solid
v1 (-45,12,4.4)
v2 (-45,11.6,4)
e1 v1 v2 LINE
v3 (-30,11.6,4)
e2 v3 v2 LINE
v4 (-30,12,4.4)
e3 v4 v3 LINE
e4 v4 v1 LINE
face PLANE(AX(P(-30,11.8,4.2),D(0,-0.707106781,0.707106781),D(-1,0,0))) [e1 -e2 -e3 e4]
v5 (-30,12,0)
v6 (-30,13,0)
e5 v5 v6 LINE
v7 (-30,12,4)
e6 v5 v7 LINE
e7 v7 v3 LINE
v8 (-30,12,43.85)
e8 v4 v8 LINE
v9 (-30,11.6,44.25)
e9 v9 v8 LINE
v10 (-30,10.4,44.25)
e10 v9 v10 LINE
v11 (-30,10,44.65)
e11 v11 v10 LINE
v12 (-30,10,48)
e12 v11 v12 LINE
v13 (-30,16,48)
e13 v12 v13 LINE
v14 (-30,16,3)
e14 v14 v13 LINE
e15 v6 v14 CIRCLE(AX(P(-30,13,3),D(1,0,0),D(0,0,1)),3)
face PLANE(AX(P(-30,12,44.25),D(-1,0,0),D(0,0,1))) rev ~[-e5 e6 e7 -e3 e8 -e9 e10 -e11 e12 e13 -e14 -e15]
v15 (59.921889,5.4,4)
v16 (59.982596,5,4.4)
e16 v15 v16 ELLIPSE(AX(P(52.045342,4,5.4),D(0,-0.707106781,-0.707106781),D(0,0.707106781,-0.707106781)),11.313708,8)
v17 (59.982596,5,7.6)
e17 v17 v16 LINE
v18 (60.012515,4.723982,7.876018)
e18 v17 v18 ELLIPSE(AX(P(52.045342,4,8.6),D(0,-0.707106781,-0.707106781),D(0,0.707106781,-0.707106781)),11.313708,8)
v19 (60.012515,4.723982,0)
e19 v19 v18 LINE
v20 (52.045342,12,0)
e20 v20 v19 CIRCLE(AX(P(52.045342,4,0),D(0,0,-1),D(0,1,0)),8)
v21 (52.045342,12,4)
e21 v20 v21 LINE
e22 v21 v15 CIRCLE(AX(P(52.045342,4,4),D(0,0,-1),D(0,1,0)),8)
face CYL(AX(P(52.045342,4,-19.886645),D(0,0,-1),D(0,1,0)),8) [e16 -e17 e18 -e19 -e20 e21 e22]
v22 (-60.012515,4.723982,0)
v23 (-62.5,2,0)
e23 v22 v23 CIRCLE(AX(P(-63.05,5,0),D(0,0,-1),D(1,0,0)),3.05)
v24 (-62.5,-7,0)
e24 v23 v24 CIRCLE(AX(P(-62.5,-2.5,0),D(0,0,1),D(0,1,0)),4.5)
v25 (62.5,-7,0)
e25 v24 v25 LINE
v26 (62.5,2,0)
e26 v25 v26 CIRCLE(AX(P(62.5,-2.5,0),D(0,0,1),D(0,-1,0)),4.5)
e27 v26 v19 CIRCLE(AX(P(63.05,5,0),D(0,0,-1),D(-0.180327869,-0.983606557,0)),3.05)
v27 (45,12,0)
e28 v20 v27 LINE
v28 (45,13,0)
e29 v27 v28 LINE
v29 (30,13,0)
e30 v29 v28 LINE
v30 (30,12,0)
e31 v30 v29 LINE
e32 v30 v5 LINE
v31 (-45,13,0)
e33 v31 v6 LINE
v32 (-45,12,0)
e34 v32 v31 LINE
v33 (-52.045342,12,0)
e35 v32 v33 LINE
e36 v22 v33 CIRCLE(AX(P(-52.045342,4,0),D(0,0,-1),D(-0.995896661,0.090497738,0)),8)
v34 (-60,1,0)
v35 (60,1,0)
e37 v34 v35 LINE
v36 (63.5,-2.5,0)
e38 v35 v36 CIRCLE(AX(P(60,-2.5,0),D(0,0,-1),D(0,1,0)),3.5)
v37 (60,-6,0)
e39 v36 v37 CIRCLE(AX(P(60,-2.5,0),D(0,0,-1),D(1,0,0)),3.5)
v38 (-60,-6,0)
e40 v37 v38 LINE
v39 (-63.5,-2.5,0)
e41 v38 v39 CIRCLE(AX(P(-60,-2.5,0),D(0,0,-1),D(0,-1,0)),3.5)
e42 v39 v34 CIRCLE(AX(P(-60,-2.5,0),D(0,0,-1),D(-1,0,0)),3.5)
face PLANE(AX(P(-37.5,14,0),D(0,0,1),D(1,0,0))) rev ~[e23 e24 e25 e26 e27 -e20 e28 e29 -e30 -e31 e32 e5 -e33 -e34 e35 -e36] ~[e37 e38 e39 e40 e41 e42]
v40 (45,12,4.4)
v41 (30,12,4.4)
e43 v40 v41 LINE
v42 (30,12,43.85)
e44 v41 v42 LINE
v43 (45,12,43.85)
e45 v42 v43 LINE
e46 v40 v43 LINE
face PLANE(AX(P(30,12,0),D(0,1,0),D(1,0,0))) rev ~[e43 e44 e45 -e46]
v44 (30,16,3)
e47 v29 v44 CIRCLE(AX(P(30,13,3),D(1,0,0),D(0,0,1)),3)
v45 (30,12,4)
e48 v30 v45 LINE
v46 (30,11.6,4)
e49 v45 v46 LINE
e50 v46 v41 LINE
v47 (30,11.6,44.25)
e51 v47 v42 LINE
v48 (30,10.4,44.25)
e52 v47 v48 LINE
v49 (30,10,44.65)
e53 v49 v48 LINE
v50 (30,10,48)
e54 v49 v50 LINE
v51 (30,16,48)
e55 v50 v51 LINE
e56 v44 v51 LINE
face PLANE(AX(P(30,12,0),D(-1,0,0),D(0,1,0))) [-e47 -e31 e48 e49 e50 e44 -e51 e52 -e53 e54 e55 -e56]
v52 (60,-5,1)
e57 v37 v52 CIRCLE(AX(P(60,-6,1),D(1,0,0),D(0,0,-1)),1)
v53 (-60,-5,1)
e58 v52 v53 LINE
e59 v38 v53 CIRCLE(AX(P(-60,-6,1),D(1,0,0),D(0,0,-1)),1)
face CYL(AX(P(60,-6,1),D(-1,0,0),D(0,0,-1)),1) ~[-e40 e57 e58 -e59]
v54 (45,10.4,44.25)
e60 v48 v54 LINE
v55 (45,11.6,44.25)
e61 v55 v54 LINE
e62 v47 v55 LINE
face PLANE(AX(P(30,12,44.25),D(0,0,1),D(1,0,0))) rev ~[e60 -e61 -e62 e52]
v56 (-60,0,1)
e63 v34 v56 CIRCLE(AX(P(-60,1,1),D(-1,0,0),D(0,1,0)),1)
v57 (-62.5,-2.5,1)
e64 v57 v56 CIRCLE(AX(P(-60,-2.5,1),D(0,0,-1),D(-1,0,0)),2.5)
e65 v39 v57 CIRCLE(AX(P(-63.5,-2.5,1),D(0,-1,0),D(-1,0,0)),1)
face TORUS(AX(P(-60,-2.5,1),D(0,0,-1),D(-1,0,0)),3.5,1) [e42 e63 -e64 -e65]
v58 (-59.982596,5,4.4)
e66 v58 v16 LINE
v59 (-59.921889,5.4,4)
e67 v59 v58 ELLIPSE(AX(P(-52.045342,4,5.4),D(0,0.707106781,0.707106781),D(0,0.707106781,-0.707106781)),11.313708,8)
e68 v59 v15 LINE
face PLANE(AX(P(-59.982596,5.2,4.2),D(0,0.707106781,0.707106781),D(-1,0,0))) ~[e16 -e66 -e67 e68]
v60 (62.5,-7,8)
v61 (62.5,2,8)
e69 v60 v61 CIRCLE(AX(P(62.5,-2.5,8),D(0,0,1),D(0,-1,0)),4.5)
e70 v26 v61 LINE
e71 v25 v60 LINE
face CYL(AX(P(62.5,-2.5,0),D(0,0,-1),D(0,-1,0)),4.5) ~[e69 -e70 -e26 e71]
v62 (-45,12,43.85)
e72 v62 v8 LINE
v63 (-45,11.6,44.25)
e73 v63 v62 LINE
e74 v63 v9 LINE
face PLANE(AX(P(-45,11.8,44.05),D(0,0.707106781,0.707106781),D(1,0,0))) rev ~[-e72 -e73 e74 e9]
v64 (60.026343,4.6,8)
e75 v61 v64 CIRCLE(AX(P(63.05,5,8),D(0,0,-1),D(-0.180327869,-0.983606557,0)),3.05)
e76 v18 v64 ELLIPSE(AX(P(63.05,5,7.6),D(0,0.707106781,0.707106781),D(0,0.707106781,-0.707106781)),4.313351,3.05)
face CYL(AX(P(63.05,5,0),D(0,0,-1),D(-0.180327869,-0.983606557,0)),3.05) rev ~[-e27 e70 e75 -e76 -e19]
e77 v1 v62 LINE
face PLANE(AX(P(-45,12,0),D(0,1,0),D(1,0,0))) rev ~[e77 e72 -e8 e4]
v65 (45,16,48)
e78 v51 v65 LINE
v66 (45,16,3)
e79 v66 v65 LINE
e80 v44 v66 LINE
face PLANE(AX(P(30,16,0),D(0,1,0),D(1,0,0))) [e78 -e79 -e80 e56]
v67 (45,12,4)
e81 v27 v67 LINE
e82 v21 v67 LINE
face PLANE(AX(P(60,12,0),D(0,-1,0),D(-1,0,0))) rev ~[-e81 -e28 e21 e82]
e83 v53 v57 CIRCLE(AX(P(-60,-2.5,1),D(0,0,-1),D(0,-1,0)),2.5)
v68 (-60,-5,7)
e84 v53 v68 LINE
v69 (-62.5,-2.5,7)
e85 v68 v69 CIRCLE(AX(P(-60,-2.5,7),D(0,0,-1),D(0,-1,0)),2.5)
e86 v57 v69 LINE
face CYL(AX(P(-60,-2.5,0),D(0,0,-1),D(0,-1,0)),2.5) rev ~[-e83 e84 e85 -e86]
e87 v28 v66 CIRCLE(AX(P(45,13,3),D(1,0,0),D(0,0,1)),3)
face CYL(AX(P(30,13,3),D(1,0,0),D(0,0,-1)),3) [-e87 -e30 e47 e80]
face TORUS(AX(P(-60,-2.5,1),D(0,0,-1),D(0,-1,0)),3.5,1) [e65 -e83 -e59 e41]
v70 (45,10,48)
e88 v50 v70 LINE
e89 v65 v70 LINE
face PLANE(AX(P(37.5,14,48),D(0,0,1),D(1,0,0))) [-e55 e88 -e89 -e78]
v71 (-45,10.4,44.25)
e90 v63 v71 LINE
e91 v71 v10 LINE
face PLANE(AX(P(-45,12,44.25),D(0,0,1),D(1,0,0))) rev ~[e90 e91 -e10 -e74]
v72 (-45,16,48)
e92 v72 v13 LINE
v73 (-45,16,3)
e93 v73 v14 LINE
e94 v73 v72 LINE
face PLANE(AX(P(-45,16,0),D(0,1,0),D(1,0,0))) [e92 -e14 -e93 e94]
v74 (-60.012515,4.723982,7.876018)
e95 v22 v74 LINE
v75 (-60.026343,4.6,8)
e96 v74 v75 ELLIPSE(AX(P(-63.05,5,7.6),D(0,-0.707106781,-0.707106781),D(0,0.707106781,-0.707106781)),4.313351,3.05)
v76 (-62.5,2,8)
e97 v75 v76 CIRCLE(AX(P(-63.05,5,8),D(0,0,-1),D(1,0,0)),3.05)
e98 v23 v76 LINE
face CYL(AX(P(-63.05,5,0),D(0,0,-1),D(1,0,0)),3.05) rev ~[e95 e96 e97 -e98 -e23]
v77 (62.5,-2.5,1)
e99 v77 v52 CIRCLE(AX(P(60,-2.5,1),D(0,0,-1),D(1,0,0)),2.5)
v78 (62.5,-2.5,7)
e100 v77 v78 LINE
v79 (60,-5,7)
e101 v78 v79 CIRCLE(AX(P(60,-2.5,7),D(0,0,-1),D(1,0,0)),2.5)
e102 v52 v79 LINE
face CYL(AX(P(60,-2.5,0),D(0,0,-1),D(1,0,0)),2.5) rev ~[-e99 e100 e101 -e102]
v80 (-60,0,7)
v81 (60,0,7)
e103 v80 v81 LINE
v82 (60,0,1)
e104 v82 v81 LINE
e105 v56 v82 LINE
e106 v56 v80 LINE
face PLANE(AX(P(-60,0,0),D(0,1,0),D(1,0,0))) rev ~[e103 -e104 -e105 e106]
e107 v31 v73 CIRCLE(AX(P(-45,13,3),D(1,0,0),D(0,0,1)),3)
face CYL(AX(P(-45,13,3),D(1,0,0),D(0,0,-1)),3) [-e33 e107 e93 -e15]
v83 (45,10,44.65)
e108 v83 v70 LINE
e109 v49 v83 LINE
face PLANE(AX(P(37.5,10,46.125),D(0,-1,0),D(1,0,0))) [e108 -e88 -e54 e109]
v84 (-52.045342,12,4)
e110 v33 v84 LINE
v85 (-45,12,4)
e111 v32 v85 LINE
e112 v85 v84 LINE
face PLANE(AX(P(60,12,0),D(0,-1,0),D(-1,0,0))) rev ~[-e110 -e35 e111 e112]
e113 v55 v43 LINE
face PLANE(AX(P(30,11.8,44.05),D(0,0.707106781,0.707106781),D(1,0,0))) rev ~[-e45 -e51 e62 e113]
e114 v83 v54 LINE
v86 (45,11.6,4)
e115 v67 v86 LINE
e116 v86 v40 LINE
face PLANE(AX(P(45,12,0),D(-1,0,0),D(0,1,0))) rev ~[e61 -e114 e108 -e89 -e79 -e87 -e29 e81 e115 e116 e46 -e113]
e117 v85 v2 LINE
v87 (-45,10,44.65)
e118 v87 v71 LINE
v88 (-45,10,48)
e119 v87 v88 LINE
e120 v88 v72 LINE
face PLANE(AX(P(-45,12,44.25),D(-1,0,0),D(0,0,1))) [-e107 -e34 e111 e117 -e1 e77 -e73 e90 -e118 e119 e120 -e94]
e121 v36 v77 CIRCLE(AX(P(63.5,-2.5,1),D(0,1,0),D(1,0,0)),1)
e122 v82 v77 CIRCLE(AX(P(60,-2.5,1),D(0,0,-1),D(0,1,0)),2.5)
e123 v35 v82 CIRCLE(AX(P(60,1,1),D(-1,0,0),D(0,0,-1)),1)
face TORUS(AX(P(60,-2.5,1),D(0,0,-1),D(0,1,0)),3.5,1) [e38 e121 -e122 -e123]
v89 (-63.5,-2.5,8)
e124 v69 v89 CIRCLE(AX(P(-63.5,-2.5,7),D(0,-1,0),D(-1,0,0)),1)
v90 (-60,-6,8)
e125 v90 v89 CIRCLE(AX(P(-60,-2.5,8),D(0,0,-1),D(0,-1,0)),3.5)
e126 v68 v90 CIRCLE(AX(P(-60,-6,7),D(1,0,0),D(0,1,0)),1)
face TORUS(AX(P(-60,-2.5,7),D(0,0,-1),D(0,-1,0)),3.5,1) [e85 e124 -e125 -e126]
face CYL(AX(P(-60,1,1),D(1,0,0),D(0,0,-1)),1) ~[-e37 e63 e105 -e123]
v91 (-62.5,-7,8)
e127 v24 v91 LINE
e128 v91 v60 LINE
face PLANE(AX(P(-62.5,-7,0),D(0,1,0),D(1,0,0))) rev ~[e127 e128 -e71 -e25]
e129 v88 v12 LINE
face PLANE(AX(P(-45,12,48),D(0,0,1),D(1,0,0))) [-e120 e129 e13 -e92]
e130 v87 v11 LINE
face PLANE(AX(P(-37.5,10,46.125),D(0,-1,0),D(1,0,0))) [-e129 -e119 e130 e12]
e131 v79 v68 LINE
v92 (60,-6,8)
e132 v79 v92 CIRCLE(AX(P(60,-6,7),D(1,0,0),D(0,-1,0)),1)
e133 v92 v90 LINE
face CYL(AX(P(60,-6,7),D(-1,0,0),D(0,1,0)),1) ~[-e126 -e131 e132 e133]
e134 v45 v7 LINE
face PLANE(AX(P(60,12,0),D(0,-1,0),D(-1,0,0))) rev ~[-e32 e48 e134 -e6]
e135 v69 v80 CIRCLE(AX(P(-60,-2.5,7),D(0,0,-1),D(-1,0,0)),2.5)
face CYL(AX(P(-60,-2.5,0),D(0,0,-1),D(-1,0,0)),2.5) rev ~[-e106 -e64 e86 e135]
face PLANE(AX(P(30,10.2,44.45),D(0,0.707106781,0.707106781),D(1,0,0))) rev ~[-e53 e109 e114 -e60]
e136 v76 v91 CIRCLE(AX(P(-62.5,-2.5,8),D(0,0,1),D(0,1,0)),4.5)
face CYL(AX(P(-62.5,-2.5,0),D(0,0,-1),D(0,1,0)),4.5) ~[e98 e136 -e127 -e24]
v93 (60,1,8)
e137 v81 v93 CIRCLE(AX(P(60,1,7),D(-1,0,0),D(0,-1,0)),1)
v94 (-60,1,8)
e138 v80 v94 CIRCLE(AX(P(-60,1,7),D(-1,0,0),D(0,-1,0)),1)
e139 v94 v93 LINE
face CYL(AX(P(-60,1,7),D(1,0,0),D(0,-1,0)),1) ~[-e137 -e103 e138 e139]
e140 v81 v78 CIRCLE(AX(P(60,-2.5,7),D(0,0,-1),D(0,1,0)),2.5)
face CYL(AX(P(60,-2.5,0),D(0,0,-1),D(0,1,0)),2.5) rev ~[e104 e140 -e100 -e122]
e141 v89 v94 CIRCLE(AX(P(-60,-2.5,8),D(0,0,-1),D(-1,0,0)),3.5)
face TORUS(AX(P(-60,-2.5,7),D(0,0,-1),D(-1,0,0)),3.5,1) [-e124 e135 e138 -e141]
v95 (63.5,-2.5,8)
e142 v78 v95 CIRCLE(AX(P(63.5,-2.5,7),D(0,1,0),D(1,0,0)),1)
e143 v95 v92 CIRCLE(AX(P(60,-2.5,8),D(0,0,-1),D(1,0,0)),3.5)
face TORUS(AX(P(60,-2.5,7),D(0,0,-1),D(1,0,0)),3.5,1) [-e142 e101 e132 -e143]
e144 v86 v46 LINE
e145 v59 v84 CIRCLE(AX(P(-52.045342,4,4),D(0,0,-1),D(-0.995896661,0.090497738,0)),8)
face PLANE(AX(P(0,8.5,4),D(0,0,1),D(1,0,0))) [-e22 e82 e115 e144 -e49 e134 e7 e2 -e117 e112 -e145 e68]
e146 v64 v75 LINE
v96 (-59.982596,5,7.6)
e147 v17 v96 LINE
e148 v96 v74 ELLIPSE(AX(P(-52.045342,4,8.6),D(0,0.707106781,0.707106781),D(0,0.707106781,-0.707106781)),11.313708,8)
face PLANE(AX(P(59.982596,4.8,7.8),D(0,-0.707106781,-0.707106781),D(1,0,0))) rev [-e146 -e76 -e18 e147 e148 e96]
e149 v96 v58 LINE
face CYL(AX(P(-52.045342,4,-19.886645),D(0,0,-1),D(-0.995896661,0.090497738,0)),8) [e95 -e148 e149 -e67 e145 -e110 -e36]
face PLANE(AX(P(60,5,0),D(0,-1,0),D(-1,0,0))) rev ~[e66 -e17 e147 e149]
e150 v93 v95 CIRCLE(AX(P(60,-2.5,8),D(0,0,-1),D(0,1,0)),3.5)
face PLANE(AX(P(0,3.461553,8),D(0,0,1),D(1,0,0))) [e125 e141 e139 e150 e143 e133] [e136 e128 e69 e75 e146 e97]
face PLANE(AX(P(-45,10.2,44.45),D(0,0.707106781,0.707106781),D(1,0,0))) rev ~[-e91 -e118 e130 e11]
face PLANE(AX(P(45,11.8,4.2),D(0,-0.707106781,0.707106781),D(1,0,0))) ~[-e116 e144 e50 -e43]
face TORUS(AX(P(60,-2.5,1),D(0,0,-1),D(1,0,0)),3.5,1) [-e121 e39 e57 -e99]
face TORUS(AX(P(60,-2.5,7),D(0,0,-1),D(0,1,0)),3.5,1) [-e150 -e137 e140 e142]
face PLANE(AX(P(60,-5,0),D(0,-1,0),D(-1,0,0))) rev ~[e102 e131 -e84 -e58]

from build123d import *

# Parameters (mm, degrees)
F1_DEPTH    = 8
F2_DEPTH    = 8
F3_DEPTH    = 4
F0_W        = 15
F0_H        = 4
F4_DEPTH    = 48
F5_W        = 15
F5_H        = 3.75
F6_DEPTH    = 2
F7_T1_DEPTH = 43.7732905232
F8_R        = 1
F9_R        = 1
F10_R       = 3
F11_SIZE    = 0.4


# Not quite as in the source:
# - a fillet or chamfer that OpenCascade refuses, or shapes differently, is made with other operations: its cross-section is extruded or revolved along the edge and cut away or added


with BuildPart() as f1:
    # F0 (on Top) → F1 (new body)
    with BuildSketch(Plane.XY):
        with BuildLine():
            Line((60, -5), (-60, -5))
            ThreePointArc((-60, -5), (-61.767766953, -4.267766953), (-62.5, -2.5))
            Line((-62.5, -2.5), (-62.5, -7))
            Line((-62.5, -7), (62.5, -7))
            Line((62.5, -7), (62.5, -2.5))
            ThreePointArc((62.5, -2.5), (61.767766953, -4.267766953), (60, -5))
        make_face()
        with BuildLine():
            Line((62.5, 2), (62.5, -2.5))
            Line((62.5, -2.5), (62.5, -7))
            ThreePointArc((62.5, -7), (67, -2.5), (62.5, 2))
        make_face()
        with BuildLine():
            Line((-62.5, -7), (-62.5, -2.5))
            Line((-62.5, -2.5), (-62.5, 2))
            ThreePointArc((-62.5, 2), (-67, -2.5), (-62.5, -7))
        make_face()
        with BuildLine():
            ThreePointArc((-62.5, -2.5), (-61.767766953, -0.732233047), (-60, 0))
            Line((-60, 0), (60, 0))
            ThreePointArc((60, 0), (61.767766953, -0.732233047), (62.5, -2.5))
            Line((62.5, -2.5), (62.5, 2))
            Line((62.5, 2), (-62.5, 2))
            Line((-62.5, 2), (-62.5, -2.5))
        make_face()
    extrude(amount=F1_DEPTH)

    # F0 (on Top) → F2 (join)
    with BuildSketch(Plane.XY):
        with BuildLine():
            ThreePointArc((-60, 5), (-60.7069250972, 3.047437581), (-62.5, 2))
            Line((-62.5, 2), (62.5, 2))
            ThreePointArc((62.5, 2), (60.7069250972, 3.047437581), (60, 5))
            Line((60, 5), (-60, 5))
        make_face()
    extrude(amount=F2_DEPTH)

    # F0 (on Top) → F3 (join)
    with BuildSketch(Plane.XY):
        Polygon((-60, 12), (-60, 5), (60, 5), (60, 12), (45, 12), (30, 12), (-30, 12), (-45, 12), align=None)
    extrude(amount=F3_DEPTH)

    # F0 (on Top) → F4 (join)
    with BuildSketch(Plane.XY):
        with Locations((-37.5, 14)):
            Rectangle(F0_W, F0_H)
        with Locations((37.5, 14)):
            Rectangle(F0_W, F0_H)
    extrude(amount=F4_DEPTH)

    # F5 (on face) → F6 (join)
    with BuildSketch(Plane.XZ.offset(-12)):
        with Locations((-37.5, 46.125)):
            Rectangle(F5_W, F5_H)
        with Locations((37.5, 46.125)):
            Rectangle(F5_W, F5_H)
    extrude(amount=F6_DEPTH)

    # F7: fillet of radius 8 on 2 edges, made by hand

    # F7_s2 → F7_t1 (cut)
    with BuildSketch(Plane.XY.offset(-19.8866452616)):
        with BuildLine():
            ThreePointArc((52.0453418954, 12), (57.4401609283, 9.9072775118), (60.0125151838, 4.7239819005))
            Line((60.0125151838, 4.7239819005), (60.8092325126, 4.7963800905))
            ThreePointArc((60.8092325126, 4.7963800905), (60.8, 5), (60.8, 12))
            Line((60.8, 12), (60, 12.8))
            Line((60, 12.8), (52.0453418954, 12.8))
            Line((52.0453418954, 12.8), (52.0453418954, 12))
        make_face()
        with BuildLine():
            ThreePointArc((-60.0125151838, 4.7239819005), (-57.4401609283, 9.9072775118), (-52.0453418954, 12))
            Line((-52.0453418954, 12), (-52.0453418954, 12.8))
            Line((-52.0453418954, 12.8), (-60, 12.8))
            Line((-60, 12.8), (-60.8, 12))
            ThreePointArc((-60.8, 12), (-60.8, 5), (-60.8092325126, 4.7963800905))
            Line((-60.8092325126, 4.7963800905), (-60.0125151838, 4.7239819005))
        make_face()
    extrude(amount=F7_T1_DEPTH, mode=Mode.SUBTRACT)

    # F8
    f8_edges = [f1.edges().sort_by_distance(p)[0] for p in [
        (0, 0, 8),
    ]]
    fillet(f8_edges, radius=F8_R)

    # F9
    f9_edges = [f1.edges().sort_by_distance(p)[0] for p in [
        (0, -5, 0),
        (62.5, -2.5, 0),
        (-62.5, -2.5, 0),
        (0, 0, 0),
    ]]
    fillet(f9_edges, radius=F9_R)

    # F10
    f10_edges = [f1.edges().sort_by_distance(p)[0] for p in [
        (-37.5, 16, 0),
        (37.5, 16, 0),
    ]]
    fillet(f10_edges, radius=F10_R)

    # F11
    f11_edges = [f1.edges().sort_by_distance(p)[0] for p in [
        (0, 5, 4),
        (-37.5, 12, 4),
        (37.5, 12, 4),
        (0, 5, 8),
        (37.5, 12, 44.25),
        (-37.5, 12, 44.25),
        (-37.5, 10, 44.25),
        (37.5, 10, 44.25),
    ]]
    chamfer(f11_edges, length=F11_SIZE)


solid = f1.part
